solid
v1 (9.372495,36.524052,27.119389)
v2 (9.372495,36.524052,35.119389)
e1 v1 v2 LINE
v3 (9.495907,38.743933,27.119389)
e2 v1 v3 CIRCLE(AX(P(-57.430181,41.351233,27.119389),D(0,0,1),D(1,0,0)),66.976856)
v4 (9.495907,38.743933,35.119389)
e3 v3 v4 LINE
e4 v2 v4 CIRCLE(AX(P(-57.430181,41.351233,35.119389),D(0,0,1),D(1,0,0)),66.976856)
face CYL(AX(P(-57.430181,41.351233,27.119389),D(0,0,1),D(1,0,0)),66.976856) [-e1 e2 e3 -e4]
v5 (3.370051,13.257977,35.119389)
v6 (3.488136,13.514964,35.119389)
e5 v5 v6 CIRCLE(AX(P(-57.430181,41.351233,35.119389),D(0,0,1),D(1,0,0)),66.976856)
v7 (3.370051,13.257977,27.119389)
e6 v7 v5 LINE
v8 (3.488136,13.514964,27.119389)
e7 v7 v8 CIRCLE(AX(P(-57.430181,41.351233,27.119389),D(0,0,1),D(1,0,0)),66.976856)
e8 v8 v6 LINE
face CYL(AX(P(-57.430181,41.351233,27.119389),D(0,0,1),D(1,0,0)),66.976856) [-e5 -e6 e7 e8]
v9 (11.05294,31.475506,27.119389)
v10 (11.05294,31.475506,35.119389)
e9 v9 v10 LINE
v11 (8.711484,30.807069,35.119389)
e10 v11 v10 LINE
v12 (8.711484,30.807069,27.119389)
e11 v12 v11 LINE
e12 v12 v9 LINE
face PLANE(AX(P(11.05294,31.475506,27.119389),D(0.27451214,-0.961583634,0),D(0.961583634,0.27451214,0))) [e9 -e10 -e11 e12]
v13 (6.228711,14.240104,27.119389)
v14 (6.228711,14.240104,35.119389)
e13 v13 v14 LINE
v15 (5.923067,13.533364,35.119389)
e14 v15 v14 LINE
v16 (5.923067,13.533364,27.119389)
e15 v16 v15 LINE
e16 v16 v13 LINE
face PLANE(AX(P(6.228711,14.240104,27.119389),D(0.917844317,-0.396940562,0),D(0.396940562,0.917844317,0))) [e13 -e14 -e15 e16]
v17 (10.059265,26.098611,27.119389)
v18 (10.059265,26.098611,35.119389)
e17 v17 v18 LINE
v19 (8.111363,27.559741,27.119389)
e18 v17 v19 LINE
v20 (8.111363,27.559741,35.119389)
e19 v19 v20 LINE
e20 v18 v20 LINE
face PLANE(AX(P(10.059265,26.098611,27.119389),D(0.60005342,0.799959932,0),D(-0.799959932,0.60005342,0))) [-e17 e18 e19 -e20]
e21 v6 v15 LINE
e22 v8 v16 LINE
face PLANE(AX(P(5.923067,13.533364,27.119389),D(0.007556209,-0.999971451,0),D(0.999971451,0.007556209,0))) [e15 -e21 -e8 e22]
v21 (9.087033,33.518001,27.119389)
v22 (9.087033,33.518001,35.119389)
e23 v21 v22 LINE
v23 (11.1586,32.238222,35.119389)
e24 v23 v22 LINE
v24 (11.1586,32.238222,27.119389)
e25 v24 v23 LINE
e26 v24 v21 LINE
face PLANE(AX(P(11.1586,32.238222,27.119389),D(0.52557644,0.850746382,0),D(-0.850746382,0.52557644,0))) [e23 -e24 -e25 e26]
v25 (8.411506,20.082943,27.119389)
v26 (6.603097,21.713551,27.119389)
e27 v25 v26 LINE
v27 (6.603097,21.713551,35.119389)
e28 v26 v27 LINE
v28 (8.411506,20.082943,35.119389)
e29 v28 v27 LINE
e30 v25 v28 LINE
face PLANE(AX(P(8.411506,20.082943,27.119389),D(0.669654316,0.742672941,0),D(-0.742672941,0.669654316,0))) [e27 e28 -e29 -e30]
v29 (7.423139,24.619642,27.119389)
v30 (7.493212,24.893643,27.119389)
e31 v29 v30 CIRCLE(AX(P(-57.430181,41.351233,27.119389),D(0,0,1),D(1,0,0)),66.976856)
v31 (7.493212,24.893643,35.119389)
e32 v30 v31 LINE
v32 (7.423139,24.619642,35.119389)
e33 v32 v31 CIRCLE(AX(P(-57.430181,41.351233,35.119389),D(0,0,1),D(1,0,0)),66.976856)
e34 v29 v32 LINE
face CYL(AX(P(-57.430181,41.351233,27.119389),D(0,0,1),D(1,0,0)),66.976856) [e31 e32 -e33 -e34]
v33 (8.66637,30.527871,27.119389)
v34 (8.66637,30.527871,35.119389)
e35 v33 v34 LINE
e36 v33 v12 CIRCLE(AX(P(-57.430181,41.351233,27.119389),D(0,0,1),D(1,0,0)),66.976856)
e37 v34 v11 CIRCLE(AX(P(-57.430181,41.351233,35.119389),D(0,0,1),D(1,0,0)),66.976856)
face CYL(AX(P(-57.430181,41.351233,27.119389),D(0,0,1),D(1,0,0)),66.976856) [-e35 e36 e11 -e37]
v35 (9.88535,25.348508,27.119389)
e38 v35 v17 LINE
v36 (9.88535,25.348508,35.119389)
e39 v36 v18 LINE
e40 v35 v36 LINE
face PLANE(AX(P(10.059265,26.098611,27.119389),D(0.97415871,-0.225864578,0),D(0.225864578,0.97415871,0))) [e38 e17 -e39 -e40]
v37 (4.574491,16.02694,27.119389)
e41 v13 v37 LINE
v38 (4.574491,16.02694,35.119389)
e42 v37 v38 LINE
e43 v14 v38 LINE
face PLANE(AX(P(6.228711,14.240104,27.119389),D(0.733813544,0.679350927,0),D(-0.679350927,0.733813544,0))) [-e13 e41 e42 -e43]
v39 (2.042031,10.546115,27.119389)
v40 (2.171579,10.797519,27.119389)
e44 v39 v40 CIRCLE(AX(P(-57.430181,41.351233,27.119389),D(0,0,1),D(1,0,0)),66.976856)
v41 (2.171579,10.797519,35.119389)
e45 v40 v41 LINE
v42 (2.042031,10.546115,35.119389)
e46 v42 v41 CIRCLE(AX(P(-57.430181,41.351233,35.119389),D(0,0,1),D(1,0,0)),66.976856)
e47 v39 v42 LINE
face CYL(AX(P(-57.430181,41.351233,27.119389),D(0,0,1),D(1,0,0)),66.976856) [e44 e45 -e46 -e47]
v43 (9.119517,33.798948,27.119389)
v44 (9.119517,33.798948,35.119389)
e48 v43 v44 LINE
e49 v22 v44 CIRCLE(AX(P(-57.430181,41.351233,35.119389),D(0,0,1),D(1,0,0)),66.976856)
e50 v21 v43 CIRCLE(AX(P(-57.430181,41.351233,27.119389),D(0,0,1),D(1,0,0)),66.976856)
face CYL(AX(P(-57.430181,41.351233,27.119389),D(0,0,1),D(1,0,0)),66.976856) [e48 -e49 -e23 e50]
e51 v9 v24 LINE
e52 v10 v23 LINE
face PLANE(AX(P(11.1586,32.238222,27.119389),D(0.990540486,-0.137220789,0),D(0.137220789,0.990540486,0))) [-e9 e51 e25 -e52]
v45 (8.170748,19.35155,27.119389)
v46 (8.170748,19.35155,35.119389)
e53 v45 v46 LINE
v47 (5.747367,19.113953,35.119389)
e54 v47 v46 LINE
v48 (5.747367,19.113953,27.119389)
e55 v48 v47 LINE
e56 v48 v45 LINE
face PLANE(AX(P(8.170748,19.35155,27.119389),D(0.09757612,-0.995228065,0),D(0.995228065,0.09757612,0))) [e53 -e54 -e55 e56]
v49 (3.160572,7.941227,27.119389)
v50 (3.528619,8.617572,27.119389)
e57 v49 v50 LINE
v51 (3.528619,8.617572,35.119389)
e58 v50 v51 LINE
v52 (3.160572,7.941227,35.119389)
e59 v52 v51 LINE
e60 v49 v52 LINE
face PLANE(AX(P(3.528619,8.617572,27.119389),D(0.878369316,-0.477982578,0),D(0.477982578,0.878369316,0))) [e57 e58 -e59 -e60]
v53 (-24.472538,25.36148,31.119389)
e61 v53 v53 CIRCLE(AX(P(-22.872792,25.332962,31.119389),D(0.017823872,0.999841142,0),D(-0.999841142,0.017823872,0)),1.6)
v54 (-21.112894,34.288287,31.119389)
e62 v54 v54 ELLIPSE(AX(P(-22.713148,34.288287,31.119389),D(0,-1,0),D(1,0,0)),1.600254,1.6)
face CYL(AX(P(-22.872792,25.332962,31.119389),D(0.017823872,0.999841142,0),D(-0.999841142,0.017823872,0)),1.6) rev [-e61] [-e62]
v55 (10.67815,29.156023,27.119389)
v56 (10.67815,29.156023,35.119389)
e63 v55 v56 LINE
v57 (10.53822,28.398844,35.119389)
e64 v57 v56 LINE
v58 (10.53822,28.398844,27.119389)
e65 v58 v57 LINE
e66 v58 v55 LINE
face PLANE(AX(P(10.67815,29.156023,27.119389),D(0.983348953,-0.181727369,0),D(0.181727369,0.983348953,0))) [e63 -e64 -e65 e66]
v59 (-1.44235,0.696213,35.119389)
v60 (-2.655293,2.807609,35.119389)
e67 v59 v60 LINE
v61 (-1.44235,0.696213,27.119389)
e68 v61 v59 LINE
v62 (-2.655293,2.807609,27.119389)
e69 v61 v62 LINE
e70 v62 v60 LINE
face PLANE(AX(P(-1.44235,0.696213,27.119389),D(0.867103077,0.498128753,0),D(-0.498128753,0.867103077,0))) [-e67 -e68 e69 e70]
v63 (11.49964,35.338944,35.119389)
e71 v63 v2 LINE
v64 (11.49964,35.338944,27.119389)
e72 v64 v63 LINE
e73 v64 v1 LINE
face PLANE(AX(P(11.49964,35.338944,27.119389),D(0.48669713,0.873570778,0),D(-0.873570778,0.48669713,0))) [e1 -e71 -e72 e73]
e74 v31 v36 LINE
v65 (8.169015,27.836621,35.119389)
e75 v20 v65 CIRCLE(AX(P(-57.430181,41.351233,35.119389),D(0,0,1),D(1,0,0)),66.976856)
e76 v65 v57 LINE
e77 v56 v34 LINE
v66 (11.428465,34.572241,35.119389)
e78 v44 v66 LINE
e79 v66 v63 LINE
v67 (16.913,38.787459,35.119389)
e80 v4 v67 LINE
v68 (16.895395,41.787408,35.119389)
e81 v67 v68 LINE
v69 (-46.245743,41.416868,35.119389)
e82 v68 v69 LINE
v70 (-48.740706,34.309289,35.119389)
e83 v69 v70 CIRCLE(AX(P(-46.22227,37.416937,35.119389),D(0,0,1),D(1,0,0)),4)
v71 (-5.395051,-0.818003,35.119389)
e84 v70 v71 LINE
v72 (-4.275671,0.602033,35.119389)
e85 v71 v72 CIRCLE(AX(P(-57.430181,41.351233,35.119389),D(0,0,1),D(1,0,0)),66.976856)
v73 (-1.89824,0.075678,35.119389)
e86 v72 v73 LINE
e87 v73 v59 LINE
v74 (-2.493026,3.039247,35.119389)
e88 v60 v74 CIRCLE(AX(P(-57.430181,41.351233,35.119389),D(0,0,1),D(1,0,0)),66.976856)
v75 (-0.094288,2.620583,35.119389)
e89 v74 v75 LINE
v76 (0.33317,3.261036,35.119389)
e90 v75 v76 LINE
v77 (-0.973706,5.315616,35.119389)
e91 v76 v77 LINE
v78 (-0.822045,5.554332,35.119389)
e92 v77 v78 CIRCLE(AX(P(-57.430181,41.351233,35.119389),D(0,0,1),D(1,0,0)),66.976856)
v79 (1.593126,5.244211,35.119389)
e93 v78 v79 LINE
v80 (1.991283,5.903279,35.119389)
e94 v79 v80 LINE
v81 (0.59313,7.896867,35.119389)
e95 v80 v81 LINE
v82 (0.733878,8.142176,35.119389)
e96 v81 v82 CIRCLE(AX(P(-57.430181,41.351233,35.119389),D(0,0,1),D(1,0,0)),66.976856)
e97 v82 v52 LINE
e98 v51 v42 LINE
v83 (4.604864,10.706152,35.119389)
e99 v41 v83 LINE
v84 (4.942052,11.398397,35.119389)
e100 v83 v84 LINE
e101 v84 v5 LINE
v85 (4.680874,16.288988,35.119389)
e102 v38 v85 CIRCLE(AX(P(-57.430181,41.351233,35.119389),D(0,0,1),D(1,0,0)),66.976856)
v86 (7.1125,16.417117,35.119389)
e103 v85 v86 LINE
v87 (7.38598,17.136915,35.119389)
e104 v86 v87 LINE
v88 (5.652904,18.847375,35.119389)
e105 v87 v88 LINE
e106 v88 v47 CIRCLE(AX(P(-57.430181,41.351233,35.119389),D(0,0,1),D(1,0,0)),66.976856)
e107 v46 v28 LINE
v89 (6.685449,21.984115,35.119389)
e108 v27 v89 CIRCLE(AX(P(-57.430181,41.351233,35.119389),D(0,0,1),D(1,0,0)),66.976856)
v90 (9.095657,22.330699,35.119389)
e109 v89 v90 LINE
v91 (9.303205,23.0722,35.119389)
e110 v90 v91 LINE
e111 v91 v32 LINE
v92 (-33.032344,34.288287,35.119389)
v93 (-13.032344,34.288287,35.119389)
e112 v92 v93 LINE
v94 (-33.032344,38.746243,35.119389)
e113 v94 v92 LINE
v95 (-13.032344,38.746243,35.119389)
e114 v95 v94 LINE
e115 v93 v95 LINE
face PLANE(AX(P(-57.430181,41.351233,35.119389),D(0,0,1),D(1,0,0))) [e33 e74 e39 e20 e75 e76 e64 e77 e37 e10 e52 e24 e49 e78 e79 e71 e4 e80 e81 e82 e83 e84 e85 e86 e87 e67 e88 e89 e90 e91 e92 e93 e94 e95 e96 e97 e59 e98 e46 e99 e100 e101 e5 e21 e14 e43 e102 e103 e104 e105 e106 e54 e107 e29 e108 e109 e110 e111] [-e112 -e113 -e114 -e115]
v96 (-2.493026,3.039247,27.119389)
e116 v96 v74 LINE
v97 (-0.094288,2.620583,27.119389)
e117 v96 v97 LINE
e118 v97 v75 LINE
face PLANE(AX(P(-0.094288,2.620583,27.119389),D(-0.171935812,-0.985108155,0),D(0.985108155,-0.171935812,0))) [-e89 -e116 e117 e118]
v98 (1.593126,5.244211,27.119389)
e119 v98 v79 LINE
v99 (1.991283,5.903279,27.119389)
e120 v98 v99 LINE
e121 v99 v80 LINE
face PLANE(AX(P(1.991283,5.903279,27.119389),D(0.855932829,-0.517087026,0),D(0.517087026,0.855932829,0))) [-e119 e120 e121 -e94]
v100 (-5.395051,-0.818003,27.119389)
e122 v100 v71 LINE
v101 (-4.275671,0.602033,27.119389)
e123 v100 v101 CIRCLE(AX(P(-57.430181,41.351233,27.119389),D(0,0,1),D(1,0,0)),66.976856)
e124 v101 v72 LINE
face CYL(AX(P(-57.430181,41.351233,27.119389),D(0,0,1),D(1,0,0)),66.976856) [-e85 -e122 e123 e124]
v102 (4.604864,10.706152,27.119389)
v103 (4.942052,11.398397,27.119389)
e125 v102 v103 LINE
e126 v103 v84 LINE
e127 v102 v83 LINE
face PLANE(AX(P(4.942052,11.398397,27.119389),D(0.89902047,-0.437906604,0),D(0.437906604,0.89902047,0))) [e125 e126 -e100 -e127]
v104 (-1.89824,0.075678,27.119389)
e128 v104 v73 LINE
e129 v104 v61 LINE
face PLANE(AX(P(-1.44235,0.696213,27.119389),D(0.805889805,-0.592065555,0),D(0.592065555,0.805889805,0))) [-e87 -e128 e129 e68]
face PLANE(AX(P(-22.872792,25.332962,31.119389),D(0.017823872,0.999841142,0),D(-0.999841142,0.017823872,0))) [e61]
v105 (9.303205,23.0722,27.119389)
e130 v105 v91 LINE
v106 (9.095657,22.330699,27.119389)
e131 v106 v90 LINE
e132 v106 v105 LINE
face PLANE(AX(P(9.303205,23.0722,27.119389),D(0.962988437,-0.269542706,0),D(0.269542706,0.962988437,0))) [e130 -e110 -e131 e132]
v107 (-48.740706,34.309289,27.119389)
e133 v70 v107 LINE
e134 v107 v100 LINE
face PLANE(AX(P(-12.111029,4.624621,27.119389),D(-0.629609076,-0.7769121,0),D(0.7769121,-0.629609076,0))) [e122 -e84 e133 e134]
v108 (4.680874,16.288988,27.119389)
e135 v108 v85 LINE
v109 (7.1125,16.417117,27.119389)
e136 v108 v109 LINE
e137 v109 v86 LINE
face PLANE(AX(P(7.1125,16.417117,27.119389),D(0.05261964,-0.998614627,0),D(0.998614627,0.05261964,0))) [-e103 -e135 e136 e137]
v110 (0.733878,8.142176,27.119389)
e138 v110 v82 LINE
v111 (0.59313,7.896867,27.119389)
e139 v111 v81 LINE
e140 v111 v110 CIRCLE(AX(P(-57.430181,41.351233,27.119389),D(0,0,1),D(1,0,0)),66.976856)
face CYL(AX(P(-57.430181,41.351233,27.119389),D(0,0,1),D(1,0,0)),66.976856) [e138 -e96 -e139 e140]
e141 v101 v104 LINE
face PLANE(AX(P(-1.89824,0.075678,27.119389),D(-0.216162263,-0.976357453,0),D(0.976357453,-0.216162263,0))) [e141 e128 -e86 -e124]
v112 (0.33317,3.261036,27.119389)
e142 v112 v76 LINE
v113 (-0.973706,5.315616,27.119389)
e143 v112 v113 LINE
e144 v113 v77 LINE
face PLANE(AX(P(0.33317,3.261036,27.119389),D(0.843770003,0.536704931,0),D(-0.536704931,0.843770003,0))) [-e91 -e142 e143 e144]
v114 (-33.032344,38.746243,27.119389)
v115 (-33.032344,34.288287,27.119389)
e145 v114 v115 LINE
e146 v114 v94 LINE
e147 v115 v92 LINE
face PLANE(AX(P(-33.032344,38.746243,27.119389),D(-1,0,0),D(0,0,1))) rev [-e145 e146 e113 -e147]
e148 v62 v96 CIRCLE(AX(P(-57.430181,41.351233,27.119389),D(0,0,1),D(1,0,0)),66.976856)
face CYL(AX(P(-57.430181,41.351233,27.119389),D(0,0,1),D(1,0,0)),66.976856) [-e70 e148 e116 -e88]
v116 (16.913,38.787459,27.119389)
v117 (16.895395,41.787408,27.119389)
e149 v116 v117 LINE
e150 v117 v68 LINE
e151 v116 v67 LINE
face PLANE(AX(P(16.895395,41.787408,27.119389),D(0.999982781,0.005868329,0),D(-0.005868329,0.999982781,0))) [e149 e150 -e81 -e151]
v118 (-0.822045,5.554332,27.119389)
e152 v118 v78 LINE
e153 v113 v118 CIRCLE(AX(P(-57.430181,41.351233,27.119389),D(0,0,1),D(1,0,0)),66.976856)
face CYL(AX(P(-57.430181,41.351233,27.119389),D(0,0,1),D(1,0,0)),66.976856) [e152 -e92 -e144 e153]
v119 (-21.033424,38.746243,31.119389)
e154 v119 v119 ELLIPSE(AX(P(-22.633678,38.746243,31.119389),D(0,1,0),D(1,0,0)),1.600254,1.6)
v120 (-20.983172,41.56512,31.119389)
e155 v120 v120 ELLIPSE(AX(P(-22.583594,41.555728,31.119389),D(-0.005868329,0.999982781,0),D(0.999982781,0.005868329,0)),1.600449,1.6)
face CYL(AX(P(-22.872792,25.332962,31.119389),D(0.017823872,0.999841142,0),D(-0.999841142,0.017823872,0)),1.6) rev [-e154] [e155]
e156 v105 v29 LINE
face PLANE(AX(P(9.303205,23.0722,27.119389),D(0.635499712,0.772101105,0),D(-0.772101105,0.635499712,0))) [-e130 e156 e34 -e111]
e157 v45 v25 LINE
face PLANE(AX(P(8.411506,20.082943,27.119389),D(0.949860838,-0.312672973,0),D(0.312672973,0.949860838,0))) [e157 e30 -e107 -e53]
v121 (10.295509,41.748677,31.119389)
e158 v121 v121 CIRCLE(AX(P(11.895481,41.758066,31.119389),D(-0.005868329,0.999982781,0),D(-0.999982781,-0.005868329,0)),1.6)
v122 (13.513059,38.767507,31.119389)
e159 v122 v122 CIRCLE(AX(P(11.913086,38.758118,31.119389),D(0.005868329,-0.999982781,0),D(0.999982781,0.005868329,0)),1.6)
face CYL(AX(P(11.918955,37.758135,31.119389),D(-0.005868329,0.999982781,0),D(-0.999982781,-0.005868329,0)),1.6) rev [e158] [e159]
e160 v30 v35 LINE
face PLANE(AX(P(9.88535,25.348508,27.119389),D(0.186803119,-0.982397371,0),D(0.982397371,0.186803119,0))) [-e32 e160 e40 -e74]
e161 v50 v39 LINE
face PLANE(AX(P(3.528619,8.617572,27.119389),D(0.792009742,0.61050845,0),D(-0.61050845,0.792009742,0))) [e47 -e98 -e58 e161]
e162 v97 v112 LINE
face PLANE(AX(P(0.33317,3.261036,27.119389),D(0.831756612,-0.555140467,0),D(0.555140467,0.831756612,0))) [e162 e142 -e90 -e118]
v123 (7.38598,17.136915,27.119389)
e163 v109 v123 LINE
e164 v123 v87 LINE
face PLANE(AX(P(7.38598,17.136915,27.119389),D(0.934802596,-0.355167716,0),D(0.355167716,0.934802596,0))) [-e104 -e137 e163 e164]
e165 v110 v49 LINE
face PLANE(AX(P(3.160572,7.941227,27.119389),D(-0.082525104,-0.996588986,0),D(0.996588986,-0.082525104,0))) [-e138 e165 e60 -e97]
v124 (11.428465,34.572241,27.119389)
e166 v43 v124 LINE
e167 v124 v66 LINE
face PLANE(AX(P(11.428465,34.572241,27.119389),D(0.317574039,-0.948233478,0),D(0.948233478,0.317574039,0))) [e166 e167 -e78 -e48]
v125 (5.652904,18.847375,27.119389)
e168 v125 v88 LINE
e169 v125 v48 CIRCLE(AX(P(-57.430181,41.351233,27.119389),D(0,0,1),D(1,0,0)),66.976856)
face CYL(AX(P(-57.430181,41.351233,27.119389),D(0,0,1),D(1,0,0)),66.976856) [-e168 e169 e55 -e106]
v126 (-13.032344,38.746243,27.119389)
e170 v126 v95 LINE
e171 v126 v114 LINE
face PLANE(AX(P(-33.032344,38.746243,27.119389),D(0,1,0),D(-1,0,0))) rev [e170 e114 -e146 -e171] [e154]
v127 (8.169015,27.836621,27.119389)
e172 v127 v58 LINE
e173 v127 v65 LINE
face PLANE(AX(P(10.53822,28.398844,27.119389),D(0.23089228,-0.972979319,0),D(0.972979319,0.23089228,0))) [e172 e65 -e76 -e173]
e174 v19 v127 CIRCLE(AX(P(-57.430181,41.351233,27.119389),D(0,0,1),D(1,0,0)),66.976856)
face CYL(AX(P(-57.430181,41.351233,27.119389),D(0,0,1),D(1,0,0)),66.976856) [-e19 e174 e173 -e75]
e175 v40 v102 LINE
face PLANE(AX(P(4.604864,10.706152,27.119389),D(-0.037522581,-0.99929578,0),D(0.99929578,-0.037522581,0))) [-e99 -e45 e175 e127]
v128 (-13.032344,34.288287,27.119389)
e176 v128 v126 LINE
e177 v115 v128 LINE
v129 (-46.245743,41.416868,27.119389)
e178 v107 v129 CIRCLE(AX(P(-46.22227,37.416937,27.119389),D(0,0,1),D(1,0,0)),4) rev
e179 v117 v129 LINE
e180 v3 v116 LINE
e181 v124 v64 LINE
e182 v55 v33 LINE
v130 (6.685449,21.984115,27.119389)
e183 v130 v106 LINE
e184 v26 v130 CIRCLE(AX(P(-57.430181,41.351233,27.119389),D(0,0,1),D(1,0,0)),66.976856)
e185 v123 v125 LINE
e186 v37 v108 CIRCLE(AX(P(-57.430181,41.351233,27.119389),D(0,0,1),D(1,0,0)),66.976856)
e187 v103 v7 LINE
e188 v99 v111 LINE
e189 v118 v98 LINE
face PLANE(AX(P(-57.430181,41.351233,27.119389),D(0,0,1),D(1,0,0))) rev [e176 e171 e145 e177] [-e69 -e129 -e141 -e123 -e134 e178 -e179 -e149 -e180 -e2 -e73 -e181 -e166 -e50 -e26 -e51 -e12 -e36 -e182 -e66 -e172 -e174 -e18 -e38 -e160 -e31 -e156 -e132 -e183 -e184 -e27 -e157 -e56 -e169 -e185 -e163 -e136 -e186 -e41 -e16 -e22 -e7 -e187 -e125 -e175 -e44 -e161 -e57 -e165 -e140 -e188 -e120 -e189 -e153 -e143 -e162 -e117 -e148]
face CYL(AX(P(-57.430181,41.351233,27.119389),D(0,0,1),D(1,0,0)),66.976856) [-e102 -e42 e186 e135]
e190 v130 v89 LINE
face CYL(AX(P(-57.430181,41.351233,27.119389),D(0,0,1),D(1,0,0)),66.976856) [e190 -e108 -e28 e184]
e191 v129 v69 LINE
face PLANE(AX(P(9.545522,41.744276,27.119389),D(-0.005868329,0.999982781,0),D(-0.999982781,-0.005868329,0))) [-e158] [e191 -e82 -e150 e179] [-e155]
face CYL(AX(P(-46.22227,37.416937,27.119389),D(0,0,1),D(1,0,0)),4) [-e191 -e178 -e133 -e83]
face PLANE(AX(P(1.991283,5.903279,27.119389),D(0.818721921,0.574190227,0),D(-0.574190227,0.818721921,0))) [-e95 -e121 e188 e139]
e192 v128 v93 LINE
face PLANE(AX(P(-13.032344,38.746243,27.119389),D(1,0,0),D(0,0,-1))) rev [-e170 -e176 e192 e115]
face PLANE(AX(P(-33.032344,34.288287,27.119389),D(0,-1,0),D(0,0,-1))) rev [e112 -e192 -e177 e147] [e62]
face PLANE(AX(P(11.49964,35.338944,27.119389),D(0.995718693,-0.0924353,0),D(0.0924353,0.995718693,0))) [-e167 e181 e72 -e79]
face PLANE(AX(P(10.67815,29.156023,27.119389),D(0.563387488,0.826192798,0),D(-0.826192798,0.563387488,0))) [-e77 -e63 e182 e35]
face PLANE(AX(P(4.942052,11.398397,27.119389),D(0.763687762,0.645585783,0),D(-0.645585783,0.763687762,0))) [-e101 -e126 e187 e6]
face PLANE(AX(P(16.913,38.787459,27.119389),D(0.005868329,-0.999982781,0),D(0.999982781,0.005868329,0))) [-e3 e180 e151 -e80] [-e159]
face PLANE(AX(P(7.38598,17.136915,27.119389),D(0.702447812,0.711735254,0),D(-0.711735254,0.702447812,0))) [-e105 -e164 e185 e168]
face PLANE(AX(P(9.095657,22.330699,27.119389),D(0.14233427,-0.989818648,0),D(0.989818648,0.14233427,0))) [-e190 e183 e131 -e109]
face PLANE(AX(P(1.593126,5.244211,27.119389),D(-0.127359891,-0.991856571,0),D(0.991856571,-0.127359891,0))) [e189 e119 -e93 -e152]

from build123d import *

# Parameters (mm, degrees)
BOSS_EXTRUDE1_DEPTH = 8
SKETCH10_W          = 20
SKETCH10_H          = 4.457955928
CUT_EXTRUDE1_DEPTH  = 8
SKETCH11_R          = 1.6
CUT_EXTRUDE2_DEPTH  = 17
CIRPATTERN1_START   = 27.11938858
CIRPATTERN1_DEPTH   = 8
FILLET1_R           = 4
SKETCH13_R          = 1.6
CUT_EXTRUDE3_DEPTH  = 4


# Read off the part's stored shape, not the designer's step: CirPattern1
with BuildPart() as part:
    # Sketch9 → Boss-Extrude1 (new body)
    with BuildSketch(Plane.XY.offset(35.11938858)):
        with BuildLine():
            Line((9.545521872, 41.744275524), (-57.430180647, 41.351233323))
            Line((-57.430180647, 41.351233323), (-12.111028973, 4.62462141))
            Line((-12.111028973, 4.62462141), (-5.395050947, -0.818002943))
            ThreePointArc((-5.395050947, -0.818002943), (4.336911047, 15.452862836), (9.11951655, 33.798948033))
            Line((9.11951655, 33.798948033), (11.42846507, 34.572240818))
            Line((11.42846507, 34.572240818), (11.499640251, 35.338944212))
            Line((11.499640251, 35.338944212), (9.372495407, 36.524051722))
            ThreePointArc((9.372495407, 36.524051722), (9.443412954, 37.633480095), (9.495906894, 38.743932705))
            Line((9.495906894, 38.743932705), (16.9130003, 38.787459396))
            Line((16.9130003, 38.787459396), (16.895395314, 41.78740774))
            Line((16.895395314, 41.78740774), (9.545521872, 41.744275524))
        make_face()
    extrude(amount=-BOSS_EXTRUDE1_DEPTH)

    # Sketch10 → Cut-Extrude1 (cut)
    with BuildSketch(Plane.XY.offset(35.11938858)):
        with Locations((-23.032343606, 36.517264559)):
            Rectangle(SKETCH10_W, SKETCH10_H)
    extrude(amount=-CUT_EXTRUDE1_DEPTH, mode=Mode.SUBTRACT)

    # Sketch11 → Cut-Extrude2 (cut)
    with BuildSketch(Plane(origin=(0.747199109, 41.914596091, 0), x_dir=(0.9998411421690517, -0.01782387236506677, 0), z_dir=(0.01782387236506677, 0.9998411421690517, 0))):
        with Locations(Location((-23.320690328, -31.11938858, 0), (0, 0, 180))):
            Circle(SKETCH11_R)
    extrude(amount=-CUT_EXTRUDE2_DEPTH, mode=Mode.SUBTRACT)

    # CirPattern1 outline → CirPattern1 (add)
    with BuildSketch(Plane.XY.offset(CIRPATTERN1_START)):
        with BuildLine():
            Line((-1.898240417, 0.075678285), (-1.442349939, 0.696213436))
            Line((-1.442349939, 0.696213436), (-2.655293453, 2.807609427))
            ThreePointArc((-2.655293453, 2.807609427), (-3.454215375, 1.696544027), (-4.275670815, 0.602033397))
            Line((-4.275670815, 0.602033397), (-1.898240417, 0.075678285))
        make_face()
        with BuildLine():
            ThreePointArc((9.087032741, 33.518000709), (8.913106654, 32.160616358), (8.711484025, 30.807068844))
            Line((8.711484025, 30.807068844), (11.052940174, 31.475505904))
            Line((11.052940174, 31.475505904), (11.158600181, 32.238222079))
            Line((11.158600181, 32.238222079), (9.087032741, 33.518000709))
        make_face()
        with BuildLine():
            ThreePointArc((8.666370259, 30.527871164), (8.431440362, 29.179705557), (8.169015006, 27.836621236))
            Line((8.169015006, 27.836621236), (10.538219647, 28.398843937))
            Line((10.538219647, 28.398843937), (10.678149721, 29.156022631))
            Line((10.678149721, 29.156022631), (8.666370259, 30.527871164))
        make_face()
        with BuildLine():
            ThreePointArc((8.11136298, 27.559740684), (7.81590678, 26.223534041), (7.493212091, 24.893642806))
            Line((7.493212091, 24.893642806), (9.885349689, 25.348508399))
            Line((9.885349689, 25.348508399), (10.059265414, 26.098610606))
            Line((10.059265414, 26.098610606), (8.11136298, 27.559740684))
        make_face()
        with BuildLine():
            ThreePointArc((7.423138984, 24.619642155), (7.067757013, 23.298110387), (6.685448884, 21.984115313))
            Line((6.685448884, 21.984115313), (9.095657291, 22.330699261))
            Line((9.095657291, 22.330699261), (9.303205175, 23.072200358))
            Line((9.303205175, 23.072200358), (7.423138984, 24.619642155))
        make_face()
        with BuildLine():
            ThreePointArc((6.603097126, 21.713551487), (6.188511716, 20.409380678), (5.74736721, 19.113952531))
            Line((5.74736721, 19.113952531), (8.170747547, 19.351550382))
            Line((8.170747547, 19.351550382), (8.411505736, 20.082943228))
            Line((8.411505736, 20.082943228), (6.603097126, 21.713551487))
        make_face()
        with BuildLine():
            ThreePointArc((5.652904183, 18.847375463), (5.179958002, 17.563216411), (4.680873768, 16.288988219))
            Line((4.680873768, 16.288988219), (7.112500384, 16.417117043))
            Line((7.112500384, 16.417117043), (7.385979526, 17.136915042))
            Line((7.385979526, 17.136915042), (5.652904183, 18.847375463))
        make_face()
        with BuildLine():
            ThreePointArc((4.574491474, 16.026939742), (4.04414581, 14.76540257), (3.488136265, 13.514964269))
            Line((3.488136265, 13.514964269), (5.923066749, 13.533363638))
            Line((5.923066749, 13.533363638), (6.228710981, 14.240103762))
            Line((6.228710981, 14.240103762), (4.574491474, 16.026939742))
        make_face()
        with BuildLine():
            ThreePointArc((3.370050932, 13.257977012), (2.783383741, 12.021625861), (2.171579003, 10.797519035))
            Line((2.171579003, 10.797519035), (4.604864227, 10.70615155))
            Line((4.604864227, 10.70615155), (4.942052312, 11.398397312))
            Line((4.942052312, 11.398397312), (3.370050932, 13.257977012))
        make_face()
        with BuildLine():
            ThreePointArc((2.042030645, 10.546115336), (1.400234361, 9.337463157), (0.733877956, 8.142175869))
            Line((0.733877956, 8.142175869), (3.160572137, 7.94122724))
            Line((3.160572137, 7.94122724), (3.528618722, 8.617571614))
            Line((3.528618722, 8.617571614), (2.042030645, 10.546115336))
        make_face()
        with BuildLine():
            ThreePointArc((0.593129889, 7.896866722), (-0.102491005, 6.718370166), (-0.82204467, 5.554331901))
            Line((-0.82204467, 5.554331901), (1.593126081, 5.244210567))
            Line((1.593126081, 5.244210567), (1.991283091, 5.903278845))
            Line((1.991283091, 5.903278845), (0.593129889, 7.896866722))
        make_face()
        with BuildLine():
            ThreePointArc((-0.973706371, 5.315615908), (-1.721737986, 4.169670332), (-2.493026381, 3.039247062))
            Line((-2.493026381, 3.039247062), (-0.094288024, 2.620583361))
            Line((-0.094288024, 2.620583361), (0.333170136, 3.261035952))
            Line((0.333170136, 3.261035952), (-0.973706371, 5.315615908))
        make_face()
    extrude(amount=CIRPATTERN1_DEPTH)

    # Fillet1
    fillet1_edges = [part.edges().sort_by_distance(p)[0] for p in [
        (-57.430180647, 41.351233323, 31.11938858),
    ]]
    fillet(fillet1_edges, radius=FILLET1_R)

    # Sketch13 → Cut-Extrude3 (cut)
    with BuildSketch(Plane(origin=(-0.244636188, 41.68682267, 0), x_dir=(0.9999827812112165, 0.005868328644527354, 0), z_dir=(-0.005868328644527354, 0.9999827812112165, 0))):
        with Locations(Location((12.140326638, -31.11938858, 0), (0, 0, 180))):
            Circle(SKETCH13_R)
    extrude(amount=-CUT_EXTRUDE3_DEPTH, mode=Mode.SUBTRACT)


solid = part.part
